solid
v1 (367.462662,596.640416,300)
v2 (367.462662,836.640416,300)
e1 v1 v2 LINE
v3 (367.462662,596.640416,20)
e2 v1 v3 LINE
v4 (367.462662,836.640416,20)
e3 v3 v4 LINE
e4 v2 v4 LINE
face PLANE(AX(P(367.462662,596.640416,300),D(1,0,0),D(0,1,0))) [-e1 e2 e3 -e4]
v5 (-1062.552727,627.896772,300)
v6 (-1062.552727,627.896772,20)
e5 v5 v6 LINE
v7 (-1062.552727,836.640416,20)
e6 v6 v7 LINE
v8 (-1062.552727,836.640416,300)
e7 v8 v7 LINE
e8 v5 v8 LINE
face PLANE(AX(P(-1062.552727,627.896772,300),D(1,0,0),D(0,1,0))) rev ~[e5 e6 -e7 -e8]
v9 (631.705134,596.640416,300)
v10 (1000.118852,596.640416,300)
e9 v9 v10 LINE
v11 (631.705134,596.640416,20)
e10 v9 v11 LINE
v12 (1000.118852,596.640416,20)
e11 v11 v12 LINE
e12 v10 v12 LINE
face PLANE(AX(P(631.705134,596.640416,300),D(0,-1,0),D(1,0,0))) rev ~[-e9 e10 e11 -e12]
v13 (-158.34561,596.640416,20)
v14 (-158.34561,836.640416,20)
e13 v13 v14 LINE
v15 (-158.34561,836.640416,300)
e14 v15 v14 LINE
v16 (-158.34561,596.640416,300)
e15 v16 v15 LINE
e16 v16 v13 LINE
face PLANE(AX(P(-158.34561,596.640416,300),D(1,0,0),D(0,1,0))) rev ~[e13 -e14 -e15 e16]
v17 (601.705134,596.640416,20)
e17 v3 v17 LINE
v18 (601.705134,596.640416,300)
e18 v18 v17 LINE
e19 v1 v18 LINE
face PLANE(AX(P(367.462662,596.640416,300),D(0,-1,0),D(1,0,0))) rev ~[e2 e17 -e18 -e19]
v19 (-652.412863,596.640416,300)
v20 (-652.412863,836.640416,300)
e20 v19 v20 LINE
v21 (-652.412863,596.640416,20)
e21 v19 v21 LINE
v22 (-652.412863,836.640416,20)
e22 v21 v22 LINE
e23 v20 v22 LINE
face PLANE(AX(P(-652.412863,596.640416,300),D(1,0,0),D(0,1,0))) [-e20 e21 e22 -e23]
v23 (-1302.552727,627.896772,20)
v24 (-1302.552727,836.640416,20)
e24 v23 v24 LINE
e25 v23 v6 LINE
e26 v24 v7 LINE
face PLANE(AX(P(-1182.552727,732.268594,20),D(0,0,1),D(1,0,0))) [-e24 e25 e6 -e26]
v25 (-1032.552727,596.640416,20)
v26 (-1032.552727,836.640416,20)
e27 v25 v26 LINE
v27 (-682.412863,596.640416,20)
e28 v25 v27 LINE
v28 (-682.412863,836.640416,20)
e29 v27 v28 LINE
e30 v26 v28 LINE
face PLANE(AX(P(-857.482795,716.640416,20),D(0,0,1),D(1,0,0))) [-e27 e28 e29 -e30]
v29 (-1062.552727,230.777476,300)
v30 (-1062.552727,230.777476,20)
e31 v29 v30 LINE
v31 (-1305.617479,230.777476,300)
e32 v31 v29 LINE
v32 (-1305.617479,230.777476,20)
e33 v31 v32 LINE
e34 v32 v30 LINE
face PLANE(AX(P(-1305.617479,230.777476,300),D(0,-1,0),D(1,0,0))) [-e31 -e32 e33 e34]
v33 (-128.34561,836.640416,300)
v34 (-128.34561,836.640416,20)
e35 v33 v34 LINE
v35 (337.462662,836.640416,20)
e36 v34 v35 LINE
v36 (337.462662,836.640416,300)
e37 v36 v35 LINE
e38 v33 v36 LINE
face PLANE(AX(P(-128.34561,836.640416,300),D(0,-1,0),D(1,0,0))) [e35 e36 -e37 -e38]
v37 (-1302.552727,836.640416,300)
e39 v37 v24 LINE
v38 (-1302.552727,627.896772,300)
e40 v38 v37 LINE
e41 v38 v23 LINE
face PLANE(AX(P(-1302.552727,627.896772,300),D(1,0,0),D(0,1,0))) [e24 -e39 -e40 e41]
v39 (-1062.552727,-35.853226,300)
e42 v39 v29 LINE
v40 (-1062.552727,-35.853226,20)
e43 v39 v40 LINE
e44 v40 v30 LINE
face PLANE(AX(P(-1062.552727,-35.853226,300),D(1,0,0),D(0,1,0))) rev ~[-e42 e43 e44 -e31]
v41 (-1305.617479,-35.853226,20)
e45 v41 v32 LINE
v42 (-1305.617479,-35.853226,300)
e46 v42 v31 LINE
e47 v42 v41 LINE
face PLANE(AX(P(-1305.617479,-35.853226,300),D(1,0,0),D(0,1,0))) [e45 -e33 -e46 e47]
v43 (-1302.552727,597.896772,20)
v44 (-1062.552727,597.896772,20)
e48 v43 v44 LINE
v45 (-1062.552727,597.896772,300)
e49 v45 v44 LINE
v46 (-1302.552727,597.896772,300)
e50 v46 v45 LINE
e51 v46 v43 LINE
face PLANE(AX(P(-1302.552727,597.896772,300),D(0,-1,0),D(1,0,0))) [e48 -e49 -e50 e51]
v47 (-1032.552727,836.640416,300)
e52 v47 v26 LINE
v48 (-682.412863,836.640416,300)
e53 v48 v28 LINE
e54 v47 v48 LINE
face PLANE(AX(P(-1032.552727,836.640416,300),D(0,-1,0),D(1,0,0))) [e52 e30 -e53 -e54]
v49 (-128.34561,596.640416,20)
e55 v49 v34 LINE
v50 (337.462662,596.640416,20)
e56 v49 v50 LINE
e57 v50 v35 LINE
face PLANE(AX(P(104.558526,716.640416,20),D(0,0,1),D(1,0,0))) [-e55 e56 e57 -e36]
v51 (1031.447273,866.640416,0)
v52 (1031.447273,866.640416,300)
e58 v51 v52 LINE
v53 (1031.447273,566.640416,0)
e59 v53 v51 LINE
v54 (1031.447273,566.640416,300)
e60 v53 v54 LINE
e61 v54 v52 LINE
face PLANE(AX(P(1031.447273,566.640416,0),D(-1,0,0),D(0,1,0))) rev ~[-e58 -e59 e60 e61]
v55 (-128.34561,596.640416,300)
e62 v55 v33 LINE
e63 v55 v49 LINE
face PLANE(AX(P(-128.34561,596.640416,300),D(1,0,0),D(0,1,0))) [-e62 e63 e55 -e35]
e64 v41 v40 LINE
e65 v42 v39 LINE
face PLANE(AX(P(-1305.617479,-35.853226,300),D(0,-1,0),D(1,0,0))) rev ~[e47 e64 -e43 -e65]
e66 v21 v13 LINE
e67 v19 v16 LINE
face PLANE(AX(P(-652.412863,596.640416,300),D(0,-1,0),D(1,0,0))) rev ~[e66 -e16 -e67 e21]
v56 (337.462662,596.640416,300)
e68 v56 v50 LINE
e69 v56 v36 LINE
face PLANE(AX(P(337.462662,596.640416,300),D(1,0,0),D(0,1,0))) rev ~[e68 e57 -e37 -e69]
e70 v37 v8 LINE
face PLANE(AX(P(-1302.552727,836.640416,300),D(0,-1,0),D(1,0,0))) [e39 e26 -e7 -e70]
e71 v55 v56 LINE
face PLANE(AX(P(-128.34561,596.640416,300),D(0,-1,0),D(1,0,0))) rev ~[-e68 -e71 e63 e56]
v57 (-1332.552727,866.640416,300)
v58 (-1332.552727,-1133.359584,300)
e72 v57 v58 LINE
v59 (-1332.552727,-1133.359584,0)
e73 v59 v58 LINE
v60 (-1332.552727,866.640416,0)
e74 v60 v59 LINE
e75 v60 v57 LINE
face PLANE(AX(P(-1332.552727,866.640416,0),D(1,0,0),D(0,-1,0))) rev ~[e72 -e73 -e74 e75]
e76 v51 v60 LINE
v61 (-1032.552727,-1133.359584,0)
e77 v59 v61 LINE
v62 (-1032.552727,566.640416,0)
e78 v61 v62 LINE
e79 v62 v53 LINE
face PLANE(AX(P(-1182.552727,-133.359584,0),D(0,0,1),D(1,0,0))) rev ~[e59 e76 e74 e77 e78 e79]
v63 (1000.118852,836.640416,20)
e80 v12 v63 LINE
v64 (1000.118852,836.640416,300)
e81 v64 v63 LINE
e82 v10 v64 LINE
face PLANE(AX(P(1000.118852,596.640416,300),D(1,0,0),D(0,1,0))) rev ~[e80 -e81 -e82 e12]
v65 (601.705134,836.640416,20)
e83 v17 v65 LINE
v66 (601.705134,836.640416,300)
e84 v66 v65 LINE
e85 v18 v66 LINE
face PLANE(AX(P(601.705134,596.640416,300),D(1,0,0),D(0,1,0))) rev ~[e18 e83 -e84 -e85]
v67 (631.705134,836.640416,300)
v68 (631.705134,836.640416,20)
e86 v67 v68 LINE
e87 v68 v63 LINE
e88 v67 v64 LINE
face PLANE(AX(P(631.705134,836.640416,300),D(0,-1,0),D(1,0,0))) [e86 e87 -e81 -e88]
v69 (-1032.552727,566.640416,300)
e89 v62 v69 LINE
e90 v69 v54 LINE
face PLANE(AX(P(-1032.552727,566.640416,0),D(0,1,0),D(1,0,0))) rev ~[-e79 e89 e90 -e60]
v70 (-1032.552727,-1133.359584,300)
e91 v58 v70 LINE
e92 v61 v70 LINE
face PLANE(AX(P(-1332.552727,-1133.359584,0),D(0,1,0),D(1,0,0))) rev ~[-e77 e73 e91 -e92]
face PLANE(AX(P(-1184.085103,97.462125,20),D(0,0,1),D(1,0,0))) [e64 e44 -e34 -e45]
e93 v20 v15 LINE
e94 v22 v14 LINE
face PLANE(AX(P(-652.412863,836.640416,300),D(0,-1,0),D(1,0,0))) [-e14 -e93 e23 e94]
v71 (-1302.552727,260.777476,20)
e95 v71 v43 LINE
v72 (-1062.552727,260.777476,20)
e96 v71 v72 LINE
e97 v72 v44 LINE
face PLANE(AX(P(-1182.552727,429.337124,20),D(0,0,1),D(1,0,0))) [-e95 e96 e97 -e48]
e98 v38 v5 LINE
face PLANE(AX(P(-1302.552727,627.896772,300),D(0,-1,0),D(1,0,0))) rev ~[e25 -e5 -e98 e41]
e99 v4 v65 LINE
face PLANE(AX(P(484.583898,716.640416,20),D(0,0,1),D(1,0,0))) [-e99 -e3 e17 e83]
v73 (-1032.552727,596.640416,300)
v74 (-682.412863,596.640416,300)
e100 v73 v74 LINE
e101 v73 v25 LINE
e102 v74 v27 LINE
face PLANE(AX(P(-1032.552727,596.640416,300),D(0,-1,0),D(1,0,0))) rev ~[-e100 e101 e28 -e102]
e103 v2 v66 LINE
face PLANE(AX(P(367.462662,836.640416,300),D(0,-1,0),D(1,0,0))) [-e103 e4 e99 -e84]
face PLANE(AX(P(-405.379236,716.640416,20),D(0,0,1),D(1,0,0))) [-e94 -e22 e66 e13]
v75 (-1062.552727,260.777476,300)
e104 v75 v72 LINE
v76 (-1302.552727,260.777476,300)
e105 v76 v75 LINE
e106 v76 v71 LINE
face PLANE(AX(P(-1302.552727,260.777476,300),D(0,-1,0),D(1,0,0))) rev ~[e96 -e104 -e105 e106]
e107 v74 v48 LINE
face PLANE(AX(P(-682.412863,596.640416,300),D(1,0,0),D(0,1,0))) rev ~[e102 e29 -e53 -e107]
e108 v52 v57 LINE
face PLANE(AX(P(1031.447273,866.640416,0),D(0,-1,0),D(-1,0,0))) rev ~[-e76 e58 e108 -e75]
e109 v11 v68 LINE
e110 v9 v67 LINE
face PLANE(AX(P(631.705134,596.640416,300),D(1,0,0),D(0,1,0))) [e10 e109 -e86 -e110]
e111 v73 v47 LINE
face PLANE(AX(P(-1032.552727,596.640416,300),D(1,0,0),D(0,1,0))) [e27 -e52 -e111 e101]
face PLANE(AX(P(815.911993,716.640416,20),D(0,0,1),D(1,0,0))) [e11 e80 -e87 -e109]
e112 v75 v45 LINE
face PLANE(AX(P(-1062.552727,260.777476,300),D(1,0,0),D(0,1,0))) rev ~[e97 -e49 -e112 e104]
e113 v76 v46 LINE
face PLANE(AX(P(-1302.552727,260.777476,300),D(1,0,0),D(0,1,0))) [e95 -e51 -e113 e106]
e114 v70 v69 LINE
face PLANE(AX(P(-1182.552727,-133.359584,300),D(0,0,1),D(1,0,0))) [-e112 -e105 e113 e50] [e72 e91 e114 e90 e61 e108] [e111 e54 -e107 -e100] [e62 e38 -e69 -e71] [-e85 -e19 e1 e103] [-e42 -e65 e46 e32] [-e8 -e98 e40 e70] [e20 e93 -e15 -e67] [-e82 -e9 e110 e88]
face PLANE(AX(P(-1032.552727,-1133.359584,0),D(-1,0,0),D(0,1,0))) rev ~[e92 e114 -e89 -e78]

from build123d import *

# Parameters (mm, degrees)
F0_W     = 2064
F0_H     = 300
F1_DEPTH = 300
F2_W     = 243.0647516251
F2_H     = 266.6307017207
F2_W_2   = 240
F2_H_2   = 337.1192961931
F2_H_3   = 208.7436437607
F2_W_3   = 350.139864234
F2_H_4   = 240
F2_W_4   = 494.0672528744
F2_W_5   = 465.8082723618
F2_W_6   = 234.2424714565
F2_W_7   = 368.4137177467
F3_DEPTH = 280


# Not quite as in the source:
# - a feature names something its author has since deleted; it is built from what else it names


with BuildPart() as f1:
    # F0 (on Top) → F1 (new body)
    with BuildSketch(Plane.XY):
        Polygon((-1332.5527270117, 866.6404155501), (-1332.5527270117, -1133.3595844499), (-1032.5527270117, -1133.3595844499), (-1032.5527270117, 566.6404155501), (-1032.5527270117, 866.6404155501), align=None)
        with Locations((-0.5527270117, 716.6404155501)):
            Rectangle(F0_W, F0_H)
    extrude(amount=F1_DEPTH)

    # F2 (on face) → F3 (cut)
    with BuildSketch(Plane.XY.offset(300)):
        with Locations((-1184.0851028242, 97.462124736)):
            Rectangle(F2_W, F2_H)
        with Locations((-1182.5527270117, 429.3371236929)):
            Rectangle(F2_W_2, F2_H_2)
        with Locations((-1182.5527270117, 732.2685936698)):
            Rectangle(F2_W_2, F2_H_3)
        with Locations((-857.4827948947, 716.6404155501)):
            Rectangle(F2_W_3, F2_H_4)
        with Locations((-405.3792363405, 716.6404155501)):
            Rectangle(F2_W_4, F2_H_4)
        with Locations((104.5585262775, 716.6404155501)):
            Rectangle(F2_W_5, F2_H_4)
        with Locations((484.5838981867, 716.6404155501)):
            Rectangle(F2_W_6, F2_H_4)
        with Locations((815.9119927883, 716.6404155501)):
            Rectangle(F2_W_7, F2_H_4)
    extrude(amount=-F3_DEPTH, mode=Mode.SUBTRACT)


solid = f1.part
